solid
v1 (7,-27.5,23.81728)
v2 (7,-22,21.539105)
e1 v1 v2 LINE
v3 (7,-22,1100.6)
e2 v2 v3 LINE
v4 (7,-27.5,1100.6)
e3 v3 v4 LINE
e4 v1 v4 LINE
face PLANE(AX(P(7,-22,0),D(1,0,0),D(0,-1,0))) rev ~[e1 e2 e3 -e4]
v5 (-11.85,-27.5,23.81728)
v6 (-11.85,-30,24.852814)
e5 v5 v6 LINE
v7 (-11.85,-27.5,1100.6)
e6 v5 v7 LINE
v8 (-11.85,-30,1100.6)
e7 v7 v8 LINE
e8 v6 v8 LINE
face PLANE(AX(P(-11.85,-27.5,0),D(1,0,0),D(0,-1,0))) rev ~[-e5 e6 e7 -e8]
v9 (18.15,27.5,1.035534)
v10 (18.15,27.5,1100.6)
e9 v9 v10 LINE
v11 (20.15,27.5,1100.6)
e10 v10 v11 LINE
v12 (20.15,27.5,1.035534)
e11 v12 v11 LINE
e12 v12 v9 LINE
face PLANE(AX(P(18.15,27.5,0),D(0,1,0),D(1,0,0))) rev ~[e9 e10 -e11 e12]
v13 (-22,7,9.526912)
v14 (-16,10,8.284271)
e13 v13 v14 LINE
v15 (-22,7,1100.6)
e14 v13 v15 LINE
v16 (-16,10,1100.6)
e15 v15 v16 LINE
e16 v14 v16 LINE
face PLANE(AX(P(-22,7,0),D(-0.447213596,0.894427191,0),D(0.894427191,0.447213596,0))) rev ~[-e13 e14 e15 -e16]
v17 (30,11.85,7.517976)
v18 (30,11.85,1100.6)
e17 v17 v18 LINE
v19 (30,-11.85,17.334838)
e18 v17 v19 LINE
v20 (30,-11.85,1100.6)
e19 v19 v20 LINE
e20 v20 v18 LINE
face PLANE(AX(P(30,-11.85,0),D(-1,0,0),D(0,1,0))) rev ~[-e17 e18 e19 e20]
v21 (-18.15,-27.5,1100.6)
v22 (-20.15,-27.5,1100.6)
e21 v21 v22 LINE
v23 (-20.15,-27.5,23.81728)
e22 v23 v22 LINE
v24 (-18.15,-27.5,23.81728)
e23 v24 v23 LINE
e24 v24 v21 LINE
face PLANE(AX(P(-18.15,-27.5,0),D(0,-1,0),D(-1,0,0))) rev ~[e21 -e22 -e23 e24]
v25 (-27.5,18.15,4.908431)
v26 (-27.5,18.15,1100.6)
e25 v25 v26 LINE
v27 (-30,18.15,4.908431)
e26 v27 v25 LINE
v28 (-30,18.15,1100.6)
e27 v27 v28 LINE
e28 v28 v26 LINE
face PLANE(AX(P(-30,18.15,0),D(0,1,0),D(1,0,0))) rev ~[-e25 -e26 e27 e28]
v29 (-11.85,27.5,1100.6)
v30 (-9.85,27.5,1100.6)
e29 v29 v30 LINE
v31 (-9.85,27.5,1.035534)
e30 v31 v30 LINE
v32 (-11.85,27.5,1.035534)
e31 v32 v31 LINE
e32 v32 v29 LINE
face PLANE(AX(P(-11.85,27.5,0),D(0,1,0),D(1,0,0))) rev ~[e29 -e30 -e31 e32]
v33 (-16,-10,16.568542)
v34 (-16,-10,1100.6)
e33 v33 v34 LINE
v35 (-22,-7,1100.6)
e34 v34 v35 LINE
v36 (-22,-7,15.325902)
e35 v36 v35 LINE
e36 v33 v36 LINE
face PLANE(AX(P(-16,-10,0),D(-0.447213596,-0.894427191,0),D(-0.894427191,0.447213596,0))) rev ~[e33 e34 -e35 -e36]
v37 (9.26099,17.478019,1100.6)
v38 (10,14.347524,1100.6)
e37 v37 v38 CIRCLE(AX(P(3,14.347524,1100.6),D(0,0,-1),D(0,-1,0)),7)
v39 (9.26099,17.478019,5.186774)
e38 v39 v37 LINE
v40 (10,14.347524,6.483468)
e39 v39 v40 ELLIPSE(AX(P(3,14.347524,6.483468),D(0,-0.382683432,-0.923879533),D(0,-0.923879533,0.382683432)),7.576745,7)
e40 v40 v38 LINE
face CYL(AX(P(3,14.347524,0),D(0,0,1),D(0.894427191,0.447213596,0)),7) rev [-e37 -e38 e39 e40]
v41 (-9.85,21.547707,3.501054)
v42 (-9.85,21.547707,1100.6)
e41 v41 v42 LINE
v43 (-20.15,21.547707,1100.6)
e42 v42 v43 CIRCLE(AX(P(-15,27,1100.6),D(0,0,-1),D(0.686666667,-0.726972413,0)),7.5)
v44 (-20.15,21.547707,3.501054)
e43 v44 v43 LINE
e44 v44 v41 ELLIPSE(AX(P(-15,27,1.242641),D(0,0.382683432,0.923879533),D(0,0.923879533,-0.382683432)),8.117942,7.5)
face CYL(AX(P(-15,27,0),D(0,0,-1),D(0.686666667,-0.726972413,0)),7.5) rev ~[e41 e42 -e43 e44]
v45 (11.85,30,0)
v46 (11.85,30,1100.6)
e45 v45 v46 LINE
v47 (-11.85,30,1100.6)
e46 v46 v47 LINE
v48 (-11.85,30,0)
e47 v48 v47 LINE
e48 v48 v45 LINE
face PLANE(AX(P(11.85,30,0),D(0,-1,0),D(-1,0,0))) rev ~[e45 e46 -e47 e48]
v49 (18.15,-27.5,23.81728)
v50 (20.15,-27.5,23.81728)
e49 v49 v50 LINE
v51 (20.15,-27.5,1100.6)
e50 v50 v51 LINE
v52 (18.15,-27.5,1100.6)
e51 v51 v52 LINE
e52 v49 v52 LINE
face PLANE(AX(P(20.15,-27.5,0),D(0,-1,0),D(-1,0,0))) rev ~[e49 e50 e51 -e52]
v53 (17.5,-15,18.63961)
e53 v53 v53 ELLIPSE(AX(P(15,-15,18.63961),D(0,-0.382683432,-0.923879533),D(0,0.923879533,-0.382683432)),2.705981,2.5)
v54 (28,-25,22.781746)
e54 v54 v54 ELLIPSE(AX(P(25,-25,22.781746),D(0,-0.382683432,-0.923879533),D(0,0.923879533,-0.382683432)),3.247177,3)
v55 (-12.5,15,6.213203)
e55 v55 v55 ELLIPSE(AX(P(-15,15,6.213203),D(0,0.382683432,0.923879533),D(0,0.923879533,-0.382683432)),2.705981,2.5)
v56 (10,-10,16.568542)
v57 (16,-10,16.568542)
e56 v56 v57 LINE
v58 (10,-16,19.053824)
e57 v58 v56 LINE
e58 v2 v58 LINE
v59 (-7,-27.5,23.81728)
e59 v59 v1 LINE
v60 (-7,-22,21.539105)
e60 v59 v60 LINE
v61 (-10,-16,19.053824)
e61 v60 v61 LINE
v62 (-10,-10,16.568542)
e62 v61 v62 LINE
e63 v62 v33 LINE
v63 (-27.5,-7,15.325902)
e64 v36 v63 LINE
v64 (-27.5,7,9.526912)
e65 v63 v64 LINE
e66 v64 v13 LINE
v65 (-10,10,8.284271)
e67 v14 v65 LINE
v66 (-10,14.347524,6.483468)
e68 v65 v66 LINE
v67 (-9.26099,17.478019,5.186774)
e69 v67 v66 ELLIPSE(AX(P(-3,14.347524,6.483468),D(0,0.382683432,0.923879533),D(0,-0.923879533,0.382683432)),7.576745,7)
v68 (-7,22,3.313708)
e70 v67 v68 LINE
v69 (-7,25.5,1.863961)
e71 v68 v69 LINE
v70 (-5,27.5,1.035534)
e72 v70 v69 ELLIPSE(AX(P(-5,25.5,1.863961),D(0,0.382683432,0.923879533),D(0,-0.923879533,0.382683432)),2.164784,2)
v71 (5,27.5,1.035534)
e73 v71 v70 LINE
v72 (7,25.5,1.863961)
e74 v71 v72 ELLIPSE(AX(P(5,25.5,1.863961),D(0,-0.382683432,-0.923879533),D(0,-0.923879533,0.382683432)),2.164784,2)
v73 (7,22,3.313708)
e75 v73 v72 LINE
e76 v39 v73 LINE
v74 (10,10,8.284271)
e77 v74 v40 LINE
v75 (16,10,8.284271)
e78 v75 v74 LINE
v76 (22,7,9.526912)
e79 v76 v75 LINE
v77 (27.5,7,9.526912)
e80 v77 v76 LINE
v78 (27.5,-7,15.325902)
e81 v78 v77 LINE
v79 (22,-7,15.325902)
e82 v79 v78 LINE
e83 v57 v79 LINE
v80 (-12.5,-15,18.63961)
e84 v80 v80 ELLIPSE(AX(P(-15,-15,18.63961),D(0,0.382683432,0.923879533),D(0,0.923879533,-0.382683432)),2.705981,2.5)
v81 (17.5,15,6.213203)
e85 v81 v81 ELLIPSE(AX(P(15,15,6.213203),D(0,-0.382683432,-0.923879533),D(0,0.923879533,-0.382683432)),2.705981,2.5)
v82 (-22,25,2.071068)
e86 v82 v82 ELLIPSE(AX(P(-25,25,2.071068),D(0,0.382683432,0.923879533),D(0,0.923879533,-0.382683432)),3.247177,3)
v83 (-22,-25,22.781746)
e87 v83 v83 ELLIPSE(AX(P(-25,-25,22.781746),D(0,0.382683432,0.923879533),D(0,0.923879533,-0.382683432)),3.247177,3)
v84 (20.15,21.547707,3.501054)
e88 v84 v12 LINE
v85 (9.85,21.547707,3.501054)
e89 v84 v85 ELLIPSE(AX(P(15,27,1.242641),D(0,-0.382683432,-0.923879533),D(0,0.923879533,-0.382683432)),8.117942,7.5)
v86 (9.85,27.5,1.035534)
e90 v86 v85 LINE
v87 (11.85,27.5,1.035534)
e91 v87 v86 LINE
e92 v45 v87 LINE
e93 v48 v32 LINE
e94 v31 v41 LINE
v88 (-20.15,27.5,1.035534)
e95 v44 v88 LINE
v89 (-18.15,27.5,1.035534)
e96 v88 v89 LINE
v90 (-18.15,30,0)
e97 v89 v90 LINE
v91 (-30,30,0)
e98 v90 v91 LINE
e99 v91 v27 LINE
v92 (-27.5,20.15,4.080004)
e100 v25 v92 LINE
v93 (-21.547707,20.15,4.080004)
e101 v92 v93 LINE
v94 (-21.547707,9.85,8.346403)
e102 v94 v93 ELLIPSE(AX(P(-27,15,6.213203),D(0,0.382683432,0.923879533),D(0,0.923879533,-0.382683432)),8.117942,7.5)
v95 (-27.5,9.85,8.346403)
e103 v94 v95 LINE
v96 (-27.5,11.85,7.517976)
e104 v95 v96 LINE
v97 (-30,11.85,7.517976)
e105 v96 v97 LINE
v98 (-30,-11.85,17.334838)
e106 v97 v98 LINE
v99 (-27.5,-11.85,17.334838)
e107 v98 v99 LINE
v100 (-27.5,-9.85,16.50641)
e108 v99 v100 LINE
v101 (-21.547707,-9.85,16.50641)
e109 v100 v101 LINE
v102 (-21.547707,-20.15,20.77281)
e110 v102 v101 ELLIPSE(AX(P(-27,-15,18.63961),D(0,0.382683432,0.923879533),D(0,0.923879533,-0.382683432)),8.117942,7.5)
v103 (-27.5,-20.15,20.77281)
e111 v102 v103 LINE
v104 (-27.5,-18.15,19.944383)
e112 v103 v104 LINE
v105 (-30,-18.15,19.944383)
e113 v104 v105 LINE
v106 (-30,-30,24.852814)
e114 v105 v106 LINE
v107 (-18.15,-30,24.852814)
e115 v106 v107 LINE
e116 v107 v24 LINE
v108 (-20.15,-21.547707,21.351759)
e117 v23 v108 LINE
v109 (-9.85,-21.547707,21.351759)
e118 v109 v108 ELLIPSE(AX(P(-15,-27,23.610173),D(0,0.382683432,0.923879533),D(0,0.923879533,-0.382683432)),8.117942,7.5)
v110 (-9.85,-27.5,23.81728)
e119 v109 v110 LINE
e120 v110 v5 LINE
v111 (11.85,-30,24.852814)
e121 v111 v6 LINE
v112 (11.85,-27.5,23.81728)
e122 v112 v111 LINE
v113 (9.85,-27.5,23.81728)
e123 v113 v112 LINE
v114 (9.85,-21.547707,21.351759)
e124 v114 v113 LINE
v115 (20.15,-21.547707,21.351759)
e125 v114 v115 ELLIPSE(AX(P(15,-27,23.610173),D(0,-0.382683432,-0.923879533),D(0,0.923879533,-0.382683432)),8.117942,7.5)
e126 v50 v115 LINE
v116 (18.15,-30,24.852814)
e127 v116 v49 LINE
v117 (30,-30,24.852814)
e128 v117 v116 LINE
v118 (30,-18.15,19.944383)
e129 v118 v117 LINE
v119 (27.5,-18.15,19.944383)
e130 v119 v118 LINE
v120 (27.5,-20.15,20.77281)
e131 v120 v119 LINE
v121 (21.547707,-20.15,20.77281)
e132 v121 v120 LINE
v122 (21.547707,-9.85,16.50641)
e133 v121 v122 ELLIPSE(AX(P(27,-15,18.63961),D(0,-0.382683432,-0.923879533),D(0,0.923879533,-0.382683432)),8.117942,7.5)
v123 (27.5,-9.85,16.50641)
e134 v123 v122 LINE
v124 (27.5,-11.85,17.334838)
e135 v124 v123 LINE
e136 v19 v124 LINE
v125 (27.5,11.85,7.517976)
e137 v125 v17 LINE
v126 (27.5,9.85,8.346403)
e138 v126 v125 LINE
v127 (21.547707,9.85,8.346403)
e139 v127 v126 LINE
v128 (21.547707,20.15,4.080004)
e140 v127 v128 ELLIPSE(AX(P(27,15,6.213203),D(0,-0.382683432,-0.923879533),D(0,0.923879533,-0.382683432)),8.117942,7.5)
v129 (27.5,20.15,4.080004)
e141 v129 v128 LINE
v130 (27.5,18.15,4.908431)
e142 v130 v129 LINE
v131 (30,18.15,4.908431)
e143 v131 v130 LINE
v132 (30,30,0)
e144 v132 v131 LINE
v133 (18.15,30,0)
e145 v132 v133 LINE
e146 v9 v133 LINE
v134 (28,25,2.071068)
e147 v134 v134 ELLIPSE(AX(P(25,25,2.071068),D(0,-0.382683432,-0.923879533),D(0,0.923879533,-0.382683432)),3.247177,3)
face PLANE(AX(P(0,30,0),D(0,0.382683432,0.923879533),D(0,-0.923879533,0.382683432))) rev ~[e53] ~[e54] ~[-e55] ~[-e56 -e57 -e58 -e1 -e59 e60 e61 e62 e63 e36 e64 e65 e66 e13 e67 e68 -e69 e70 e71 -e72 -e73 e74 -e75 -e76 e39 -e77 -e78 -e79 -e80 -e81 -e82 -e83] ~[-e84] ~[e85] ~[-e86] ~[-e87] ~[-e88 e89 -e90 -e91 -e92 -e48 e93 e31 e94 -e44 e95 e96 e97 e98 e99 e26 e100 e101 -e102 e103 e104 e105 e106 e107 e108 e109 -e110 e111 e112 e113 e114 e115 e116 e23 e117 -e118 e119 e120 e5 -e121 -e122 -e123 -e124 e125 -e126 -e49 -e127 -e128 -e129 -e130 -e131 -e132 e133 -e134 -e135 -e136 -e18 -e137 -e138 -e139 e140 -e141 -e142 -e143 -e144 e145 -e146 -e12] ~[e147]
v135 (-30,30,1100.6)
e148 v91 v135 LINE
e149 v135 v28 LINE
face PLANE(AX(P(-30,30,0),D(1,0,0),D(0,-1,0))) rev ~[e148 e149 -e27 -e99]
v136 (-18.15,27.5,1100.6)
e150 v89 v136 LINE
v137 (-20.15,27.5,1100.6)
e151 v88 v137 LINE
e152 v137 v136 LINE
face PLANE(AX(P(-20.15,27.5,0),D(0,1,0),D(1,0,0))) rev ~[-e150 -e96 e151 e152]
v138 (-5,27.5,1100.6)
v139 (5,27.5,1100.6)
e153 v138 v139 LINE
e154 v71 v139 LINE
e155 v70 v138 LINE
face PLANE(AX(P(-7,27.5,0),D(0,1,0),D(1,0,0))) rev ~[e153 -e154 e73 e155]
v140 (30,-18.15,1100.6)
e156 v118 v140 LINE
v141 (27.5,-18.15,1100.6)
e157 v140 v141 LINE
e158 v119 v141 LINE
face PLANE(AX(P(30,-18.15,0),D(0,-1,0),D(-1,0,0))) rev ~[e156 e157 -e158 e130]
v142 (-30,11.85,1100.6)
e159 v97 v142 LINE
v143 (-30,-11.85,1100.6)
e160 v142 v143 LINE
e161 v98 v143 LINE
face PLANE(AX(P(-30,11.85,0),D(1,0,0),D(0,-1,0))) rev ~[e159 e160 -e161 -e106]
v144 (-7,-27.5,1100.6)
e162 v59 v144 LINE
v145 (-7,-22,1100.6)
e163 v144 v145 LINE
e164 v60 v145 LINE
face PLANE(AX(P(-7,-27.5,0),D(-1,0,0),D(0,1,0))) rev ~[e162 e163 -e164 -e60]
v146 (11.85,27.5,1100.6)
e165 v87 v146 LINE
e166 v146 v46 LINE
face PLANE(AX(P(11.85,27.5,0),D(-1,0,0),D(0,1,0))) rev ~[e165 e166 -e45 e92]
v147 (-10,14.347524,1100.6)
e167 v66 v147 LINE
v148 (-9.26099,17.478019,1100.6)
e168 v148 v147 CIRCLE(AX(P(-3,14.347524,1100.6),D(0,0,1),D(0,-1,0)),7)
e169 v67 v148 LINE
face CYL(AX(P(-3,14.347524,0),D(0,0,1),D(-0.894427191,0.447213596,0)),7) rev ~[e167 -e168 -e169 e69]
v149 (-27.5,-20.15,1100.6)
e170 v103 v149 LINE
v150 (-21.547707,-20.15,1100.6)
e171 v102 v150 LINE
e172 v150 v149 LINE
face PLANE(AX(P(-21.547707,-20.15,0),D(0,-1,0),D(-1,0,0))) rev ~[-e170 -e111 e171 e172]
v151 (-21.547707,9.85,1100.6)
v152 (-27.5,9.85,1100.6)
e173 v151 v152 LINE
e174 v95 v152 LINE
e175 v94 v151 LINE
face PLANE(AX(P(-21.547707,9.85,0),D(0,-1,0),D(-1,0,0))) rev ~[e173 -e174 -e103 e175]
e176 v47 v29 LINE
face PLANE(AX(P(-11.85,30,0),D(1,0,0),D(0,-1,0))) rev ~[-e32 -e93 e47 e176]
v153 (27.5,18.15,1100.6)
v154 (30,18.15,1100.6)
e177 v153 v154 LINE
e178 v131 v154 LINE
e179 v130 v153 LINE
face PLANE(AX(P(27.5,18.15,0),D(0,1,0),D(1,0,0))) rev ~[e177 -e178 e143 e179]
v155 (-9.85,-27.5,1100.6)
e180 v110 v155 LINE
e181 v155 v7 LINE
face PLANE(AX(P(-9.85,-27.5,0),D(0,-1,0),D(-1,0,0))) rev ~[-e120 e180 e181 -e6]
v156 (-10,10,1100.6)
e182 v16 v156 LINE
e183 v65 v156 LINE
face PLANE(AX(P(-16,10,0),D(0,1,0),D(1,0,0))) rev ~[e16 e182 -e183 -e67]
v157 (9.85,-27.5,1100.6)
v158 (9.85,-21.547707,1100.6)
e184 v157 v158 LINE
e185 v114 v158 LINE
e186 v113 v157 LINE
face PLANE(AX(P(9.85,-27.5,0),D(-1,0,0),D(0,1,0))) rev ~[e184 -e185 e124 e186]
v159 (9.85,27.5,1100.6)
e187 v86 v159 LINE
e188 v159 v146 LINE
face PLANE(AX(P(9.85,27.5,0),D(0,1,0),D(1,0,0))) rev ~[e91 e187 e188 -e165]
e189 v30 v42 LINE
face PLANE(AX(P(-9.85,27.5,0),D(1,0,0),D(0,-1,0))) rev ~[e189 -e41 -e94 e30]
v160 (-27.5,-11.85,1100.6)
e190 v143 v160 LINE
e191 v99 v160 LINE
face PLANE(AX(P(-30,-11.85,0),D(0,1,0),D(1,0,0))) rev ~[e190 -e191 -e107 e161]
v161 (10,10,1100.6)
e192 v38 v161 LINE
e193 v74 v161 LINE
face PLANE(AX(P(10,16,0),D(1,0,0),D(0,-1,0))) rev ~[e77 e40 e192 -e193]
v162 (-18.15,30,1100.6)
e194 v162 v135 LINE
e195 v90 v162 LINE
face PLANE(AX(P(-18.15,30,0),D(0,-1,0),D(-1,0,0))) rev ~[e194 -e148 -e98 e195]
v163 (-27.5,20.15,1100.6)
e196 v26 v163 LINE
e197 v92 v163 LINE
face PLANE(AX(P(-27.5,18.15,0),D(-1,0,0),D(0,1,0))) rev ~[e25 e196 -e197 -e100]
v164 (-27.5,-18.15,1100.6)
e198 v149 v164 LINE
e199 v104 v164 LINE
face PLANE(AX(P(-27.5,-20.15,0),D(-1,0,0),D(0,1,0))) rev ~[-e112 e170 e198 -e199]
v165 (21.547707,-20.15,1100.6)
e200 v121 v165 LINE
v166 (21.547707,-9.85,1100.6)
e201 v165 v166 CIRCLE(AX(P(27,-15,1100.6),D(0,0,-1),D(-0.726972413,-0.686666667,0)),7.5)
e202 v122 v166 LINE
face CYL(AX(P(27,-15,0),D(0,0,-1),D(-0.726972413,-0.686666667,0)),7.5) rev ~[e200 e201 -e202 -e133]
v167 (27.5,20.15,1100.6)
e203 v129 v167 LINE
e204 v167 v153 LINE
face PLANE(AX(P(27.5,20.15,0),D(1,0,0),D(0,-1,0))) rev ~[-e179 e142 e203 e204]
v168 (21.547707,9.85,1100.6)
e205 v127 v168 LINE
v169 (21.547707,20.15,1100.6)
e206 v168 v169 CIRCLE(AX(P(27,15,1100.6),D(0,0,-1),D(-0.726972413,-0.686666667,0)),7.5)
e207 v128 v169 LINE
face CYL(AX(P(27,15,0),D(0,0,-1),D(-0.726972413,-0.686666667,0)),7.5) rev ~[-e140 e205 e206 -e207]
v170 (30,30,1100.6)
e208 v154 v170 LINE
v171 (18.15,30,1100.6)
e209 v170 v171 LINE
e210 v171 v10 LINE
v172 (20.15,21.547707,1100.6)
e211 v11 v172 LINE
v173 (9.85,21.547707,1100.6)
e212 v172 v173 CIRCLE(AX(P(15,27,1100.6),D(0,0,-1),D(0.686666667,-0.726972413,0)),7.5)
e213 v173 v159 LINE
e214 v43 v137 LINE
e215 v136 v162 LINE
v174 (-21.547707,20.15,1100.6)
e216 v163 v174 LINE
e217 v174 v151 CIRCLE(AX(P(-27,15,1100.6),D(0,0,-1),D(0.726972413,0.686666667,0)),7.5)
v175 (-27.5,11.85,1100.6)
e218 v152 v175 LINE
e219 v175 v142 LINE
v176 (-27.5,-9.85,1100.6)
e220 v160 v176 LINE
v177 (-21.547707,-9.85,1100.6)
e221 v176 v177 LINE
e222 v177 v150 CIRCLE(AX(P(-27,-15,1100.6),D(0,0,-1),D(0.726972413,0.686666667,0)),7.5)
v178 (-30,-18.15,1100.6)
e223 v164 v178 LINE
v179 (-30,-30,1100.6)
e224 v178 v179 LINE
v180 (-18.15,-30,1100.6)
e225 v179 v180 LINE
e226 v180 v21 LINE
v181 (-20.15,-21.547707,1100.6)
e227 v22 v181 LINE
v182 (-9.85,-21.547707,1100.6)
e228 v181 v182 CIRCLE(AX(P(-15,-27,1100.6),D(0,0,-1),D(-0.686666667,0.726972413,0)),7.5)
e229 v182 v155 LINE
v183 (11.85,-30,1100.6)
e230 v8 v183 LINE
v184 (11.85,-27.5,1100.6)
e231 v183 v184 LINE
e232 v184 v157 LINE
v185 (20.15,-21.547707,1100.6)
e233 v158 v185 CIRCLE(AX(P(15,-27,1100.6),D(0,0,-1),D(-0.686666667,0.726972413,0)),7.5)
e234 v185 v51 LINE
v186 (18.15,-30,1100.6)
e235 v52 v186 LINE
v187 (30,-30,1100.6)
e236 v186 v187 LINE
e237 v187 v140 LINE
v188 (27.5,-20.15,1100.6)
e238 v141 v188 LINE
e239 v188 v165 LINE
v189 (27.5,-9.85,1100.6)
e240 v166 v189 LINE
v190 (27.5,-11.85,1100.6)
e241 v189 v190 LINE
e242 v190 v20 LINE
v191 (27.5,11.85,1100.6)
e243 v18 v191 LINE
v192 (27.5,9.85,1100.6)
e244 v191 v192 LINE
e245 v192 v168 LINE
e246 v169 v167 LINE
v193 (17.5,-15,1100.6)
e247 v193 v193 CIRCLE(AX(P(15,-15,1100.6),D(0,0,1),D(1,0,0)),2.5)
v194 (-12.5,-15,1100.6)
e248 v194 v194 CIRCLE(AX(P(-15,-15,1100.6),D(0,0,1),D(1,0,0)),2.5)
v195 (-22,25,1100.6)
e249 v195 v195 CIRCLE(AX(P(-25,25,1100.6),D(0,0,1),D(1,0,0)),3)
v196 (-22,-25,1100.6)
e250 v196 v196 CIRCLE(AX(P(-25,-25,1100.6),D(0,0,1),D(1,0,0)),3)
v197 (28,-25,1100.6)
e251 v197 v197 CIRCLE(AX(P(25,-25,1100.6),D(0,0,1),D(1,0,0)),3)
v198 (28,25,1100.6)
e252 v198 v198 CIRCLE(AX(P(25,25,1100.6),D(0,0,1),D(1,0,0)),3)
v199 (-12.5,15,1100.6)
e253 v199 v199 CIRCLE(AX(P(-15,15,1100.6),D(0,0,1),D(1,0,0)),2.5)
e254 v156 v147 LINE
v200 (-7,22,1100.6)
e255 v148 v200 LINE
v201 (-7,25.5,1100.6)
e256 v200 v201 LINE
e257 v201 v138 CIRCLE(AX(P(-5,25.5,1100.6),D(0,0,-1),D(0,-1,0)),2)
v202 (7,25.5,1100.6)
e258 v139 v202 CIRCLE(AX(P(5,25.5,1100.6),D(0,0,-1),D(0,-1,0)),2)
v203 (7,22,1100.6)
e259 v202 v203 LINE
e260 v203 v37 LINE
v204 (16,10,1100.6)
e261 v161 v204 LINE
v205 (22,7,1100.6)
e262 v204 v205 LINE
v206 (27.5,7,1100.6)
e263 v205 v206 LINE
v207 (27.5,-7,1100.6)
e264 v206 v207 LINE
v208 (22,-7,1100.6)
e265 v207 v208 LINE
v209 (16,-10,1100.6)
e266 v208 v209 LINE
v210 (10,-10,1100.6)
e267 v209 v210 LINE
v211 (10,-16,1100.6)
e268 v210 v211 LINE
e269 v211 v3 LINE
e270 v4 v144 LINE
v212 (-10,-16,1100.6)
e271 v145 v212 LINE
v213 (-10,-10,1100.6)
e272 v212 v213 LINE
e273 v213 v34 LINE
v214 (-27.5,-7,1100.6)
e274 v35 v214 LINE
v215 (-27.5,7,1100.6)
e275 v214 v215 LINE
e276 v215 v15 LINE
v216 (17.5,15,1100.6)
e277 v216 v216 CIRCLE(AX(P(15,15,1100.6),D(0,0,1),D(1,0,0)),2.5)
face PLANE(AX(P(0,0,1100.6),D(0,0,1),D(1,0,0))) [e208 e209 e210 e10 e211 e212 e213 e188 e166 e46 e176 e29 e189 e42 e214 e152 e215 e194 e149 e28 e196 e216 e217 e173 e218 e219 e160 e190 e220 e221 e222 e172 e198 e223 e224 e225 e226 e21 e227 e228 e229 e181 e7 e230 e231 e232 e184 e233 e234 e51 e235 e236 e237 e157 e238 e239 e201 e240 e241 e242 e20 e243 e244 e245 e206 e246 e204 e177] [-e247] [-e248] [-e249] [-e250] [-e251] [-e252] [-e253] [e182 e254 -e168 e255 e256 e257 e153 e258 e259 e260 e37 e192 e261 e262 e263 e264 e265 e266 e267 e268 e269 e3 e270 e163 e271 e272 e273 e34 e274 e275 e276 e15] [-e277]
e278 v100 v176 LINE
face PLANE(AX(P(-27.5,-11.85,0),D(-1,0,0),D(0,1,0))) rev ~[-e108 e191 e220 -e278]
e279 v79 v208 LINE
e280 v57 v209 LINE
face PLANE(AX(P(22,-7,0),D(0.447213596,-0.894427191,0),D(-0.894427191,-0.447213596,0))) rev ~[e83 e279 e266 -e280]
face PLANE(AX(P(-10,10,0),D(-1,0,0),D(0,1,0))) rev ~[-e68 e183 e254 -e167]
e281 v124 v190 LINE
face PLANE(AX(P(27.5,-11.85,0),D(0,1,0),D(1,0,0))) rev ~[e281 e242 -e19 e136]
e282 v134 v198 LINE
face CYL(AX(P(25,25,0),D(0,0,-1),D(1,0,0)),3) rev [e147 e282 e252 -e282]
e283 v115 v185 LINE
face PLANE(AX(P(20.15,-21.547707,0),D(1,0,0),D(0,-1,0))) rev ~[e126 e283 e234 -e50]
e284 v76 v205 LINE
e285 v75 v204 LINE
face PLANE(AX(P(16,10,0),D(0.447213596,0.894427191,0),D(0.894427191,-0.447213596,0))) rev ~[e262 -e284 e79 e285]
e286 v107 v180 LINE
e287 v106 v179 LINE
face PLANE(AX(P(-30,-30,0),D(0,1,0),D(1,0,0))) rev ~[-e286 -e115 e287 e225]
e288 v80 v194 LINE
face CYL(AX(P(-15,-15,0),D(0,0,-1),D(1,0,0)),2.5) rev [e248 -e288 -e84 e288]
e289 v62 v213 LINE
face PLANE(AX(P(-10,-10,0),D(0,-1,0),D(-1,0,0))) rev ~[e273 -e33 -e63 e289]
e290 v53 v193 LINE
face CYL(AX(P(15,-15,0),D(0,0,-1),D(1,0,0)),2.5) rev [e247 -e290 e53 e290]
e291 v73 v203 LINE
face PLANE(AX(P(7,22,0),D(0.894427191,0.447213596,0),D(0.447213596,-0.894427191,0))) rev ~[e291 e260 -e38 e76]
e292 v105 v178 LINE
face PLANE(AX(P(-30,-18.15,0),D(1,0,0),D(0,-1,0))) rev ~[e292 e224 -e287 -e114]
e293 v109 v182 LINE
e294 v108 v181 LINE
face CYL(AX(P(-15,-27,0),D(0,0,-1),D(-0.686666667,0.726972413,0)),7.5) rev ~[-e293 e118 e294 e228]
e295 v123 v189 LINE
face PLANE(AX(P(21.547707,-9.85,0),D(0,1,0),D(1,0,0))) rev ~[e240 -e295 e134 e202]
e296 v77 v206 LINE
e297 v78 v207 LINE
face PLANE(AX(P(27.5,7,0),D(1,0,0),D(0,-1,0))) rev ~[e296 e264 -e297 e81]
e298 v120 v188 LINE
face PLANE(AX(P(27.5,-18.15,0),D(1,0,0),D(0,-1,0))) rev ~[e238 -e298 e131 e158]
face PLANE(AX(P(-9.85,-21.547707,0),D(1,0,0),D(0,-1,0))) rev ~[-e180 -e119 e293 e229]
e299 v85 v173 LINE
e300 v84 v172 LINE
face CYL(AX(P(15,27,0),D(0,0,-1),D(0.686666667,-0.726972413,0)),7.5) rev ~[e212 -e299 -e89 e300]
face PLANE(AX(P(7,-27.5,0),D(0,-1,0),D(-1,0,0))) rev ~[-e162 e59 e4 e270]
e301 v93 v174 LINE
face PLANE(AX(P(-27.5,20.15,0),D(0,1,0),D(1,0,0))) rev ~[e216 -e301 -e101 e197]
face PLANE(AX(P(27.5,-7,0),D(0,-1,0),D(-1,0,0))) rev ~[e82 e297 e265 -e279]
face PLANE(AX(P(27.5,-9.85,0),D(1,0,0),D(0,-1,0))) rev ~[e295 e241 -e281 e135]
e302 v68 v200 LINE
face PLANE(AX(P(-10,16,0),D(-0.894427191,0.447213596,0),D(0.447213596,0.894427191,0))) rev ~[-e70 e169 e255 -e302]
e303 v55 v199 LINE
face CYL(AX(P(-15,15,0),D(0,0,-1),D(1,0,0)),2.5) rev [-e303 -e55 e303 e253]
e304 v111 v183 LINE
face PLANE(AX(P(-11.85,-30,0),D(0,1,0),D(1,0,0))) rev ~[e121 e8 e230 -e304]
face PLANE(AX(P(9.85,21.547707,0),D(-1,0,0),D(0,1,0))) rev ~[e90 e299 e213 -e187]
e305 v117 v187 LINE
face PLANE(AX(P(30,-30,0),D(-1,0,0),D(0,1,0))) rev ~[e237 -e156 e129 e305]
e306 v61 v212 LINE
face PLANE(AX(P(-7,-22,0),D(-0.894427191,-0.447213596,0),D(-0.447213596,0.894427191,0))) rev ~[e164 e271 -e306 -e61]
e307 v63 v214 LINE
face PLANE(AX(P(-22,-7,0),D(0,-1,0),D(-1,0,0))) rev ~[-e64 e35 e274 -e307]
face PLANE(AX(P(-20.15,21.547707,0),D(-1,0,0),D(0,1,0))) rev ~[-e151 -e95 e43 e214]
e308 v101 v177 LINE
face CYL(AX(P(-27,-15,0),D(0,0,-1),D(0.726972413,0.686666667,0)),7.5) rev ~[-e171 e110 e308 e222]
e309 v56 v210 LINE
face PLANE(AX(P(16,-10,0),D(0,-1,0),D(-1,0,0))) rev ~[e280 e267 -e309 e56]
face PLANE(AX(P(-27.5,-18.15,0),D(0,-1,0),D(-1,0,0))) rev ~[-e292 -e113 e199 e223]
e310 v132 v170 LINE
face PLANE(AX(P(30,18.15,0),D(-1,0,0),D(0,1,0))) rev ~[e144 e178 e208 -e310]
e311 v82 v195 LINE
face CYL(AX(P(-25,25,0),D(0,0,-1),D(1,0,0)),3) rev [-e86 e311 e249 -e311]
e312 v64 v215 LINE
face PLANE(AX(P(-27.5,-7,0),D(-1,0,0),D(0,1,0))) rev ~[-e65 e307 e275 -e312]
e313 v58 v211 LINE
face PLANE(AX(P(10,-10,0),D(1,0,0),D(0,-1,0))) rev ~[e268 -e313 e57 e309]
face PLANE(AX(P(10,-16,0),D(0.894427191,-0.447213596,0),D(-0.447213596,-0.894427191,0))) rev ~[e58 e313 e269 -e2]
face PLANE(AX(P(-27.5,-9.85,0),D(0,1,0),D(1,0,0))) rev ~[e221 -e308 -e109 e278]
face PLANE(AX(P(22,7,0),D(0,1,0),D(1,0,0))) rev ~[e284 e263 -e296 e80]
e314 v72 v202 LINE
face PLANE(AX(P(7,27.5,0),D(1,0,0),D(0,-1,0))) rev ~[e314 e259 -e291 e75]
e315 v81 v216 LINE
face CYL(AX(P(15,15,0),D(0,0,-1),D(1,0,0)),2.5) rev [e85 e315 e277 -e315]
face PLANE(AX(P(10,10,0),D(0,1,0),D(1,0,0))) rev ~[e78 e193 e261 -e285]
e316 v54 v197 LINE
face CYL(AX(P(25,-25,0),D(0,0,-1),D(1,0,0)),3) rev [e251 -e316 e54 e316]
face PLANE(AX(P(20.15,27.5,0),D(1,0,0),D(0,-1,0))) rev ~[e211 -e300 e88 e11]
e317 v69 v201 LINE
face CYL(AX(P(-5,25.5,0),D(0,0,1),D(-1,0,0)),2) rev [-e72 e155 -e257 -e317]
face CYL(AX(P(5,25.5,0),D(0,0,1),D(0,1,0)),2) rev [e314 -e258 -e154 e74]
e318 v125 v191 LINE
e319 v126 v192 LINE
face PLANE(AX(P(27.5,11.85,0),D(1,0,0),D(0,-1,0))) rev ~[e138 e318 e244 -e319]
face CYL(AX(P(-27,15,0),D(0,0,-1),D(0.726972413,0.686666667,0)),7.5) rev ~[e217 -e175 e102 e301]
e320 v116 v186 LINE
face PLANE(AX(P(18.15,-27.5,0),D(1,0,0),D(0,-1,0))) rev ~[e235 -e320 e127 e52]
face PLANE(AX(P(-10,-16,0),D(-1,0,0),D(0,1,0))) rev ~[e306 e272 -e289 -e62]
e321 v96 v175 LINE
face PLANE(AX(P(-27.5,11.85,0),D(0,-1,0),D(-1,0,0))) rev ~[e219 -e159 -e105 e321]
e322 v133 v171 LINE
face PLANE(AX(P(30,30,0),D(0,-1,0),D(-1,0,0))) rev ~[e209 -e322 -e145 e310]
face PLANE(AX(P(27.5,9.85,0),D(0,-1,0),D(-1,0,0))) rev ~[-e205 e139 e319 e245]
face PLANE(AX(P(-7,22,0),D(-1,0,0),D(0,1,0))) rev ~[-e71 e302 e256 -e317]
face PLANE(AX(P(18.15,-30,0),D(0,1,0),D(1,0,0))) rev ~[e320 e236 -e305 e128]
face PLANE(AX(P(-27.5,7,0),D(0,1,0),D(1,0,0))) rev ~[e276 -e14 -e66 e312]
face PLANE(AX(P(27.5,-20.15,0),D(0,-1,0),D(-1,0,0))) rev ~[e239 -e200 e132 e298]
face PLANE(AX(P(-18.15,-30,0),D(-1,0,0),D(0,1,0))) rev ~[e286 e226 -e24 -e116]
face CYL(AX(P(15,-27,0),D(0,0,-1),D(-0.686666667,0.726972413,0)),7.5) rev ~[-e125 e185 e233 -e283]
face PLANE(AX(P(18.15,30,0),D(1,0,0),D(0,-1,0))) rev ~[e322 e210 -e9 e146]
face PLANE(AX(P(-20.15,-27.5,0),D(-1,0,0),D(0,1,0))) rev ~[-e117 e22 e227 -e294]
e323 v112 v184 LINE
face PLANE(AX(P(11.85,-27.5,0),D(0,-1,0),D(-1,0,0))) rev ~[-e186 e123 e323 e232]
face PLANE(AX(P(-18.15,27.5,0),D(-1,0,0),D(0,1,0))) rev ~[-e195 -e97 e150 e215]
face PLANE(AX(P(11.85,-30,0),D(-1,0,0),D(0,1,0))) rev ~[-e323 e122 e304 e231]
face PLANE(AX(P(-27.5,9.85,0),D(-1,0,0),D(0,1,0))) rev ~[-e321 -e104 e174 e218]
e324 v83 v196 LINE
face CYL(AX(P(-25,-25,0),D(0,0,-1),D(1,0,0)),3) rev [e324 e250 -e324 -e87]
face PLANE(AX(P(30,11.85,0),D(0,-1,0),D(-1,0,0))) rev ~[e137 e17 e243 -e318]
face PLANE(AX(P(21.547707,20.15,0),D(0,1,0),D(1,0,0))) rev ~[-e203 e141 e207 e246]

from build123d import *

# Parameters (mm, degrees)
F0_R          = 3
F0_R_2        = 2.5
F1_DEPTH      = 1100.6
F2_R          = 2
F3_R          = 7
F5_DEPTH      = 30
F5_DEPTH_BACK = 30


# Not quite as in the source:
# - a feature names something its author has since deleted; it is built from what else it names


with BuildPart() as f1:
    # F0 (on Top) → F1 (new body)
    with BuildSketch(Plane.XY):
        with BuildLine():
            Line((18.15, -30), (30, -30))
            Line((30, -30), (30, -18.15))
            Line((30, -18.15), (27.5, -18.15))
            Line((27.5, -18.15), (27.5, -20.15))
            Line((27.5, -20.15), (21.5477069044, -20.15))
            ThreePointArc((21.5477069044, -20.15), (19.5, -15), (21.5477069044, -9.85))
            Line((21.5477069044, -9.85), (27.5, -9.85))
            Line((27.5, -9.85), (27.5, -11.85))
            Line((27.5, -11.85), (30, -11.85))
            Line((30, -11.85), (30, 11.85))
            Line((30, 11.85), (27.5, 11.85))
            Line((27.5, 11.85), (27.5, 9.85))
            Line((27.5, 9.85), (21.5477069044, 9.85))
            ThreePointArc((21.5477069044, 9.85), (19.5, 15), (21.5477069044, 20.15))
            Line((21.5477069044, 20.15), (27.5, 20.15))
            Line((27.5, 20.15), (27.5, 18.15))
            Line((27.5, 18.15), (30, 18.15))
            Line((30, 18.15), (30, 30))
            Line((30, 30), (18.15, 30))
            Line((18.15, 30), (18.15, 27.5))
            Line((18.15, 27.5), (20.15, 27.5))
            Line((20.15, 27.5), (20.15, 21.5477069044))
            ThreePointArc((20.15, 21.5477069044), (15, 19.5), (9.85, 21.5477069044))
            Line((9.85, 21.5477069044), (9.85, 27.5))
            Line((9.85, 27.5), (11.85, 27.5))
            Line((11.85, 27.5), (11.85, 30))
            Line((11.85, 30), (-11.85, 30))
            Line((-11.85, 30), (-11.85, 27.5))
            Line((-11.85, 27.5), (-9.85, 27.5))
            Line((-9.85, 27.5), (-9.85, 21.5477069044))
            ThreePointArc((-9.85, 21.5477069044), (-15, 19.5), (-20.15, 21.5477069044))
            Line((-20.15, 21.5477069044), (-20.15, 27.5))
            Line((-20.15, 27.5), (-18.15, 27.5))
            Line((-18.15, 27.5), (-18.15, 30))
            Line((-18.15, 30), (-30, 30))
            Line((-30, 30), (-30, 18.15))
            Line((-30, 18.15), (-27.5, 18.15))
            Line((-27.5, 18.15), (-27.5, 20.15))
            Line((-27.5, 20.15), (-21.5477069044, 20.15))
            ThreePointArc((-21.5477069044, 20.15), (-19.5, 15), (-21.5477069044, 9.85))
            Line((-21.5477069044, 9.85), (-27.5, 9.85))
            Line((-27.5, 9.85), (-27.5, 11.85))
            Line((-27.5, 11.85), (-30, 11.85))
            Line((-30, 11.85), (-30, -11.85))
            Line((-30, -11.85), (-27.5, -11.85))
            Line((-27.5, -11.85), (-27.5, -9.85))
            Line((-27.5, -9.85), (-21.5477069044, -9.85))
            ThreePointArc((-21.5477069044, -9.85), (-19.5, -15), (-21.5477069044, -20.15))
            Line((-21.5477069044, -20.15), (-27.5, -20.15))
            Line((-27.5, -20.15), (-27.5, -18.15))
            Line((-27.5, -18.15), (-30, -18.15))
            Line((-30, -18.15), (-30, -30))
            Line((-30, -30), (-18.15, -30))
            Line((-18.15, -30), (-18.15, -27.5))
            Line((-18.15, -27.5), (-20.15, -27.5))
            Line((-20.15, -27.5), (-20.15, -21.5477069044))
            ThreePointArc((-20.15, -21.5477069044), (-15, -19.5), (-9.85, -21.5477069044))
            Line((-9.85, -21.5477069044), (-9.85, -27.5))
            Line((-9.85, -27.5), (-11.85, -27.5))
            Line((-11.85, -27.5), (-11.85, -30))
            Line((-11.85, -30), (11.85, -30))
            Line((11.85, -30), (11.85, -27.5))
            Line((11.85, -27.5), (9.85, -27.5))
            Line((9.85, -27.5), (9.85, -21.5477069044))
            ThreePointArc((9.85, -21.5477069044), (15, -19.5), (20.15, -21.5477069044))
            Line((20.15, -21.5477069044), (20.15, -27.5))
            Line((20.15, -27.5), (18.15, -27.5))
            Line((18.15, -27.5), (18.15, -30))
        make_face()
        with Locations((-25, -25)):
            Circle(F0_R, mode=Mode.SUBTRACT)
        with Locations((-15, -15)):
            Circle(F0_R_2, mode=Mode.SUBTRACT)
        with Locations((25, -25)):
            Circle(F0_R, mode=Mode.SUBTRACT)
        with Locations((15, -15)):
            Circle(F0_R_2, mode=Mode.SUBTRACT)
        with Locations((-25, 25)):
            Circle(F0_R, mode=Mode.SUBTRACT)
        with Locations((-15, 15)):
            Circle(F0_R_2, mode=Mode.SUBTRACT)
        Polygon((-7, 22), (-7, 27.5), (0, 27.5), (7, 27.5), (7, 22), (10, 16), (10, 10), (16, 10), (22, 7), (27.5, 7), (27.5, 0), (27.5, -7), (22, -7), (16, -10), (10, -10), (10, -16), (7, -22), (7, -27.5), (0, -27.5), (-7, -27.5), (-7, -22), (-10, -16), (-10, -10), (-16, -10), (-22, -7), (-27.5, -7), (-27.5, 0), (-27.5, 7), (-22, 7), (-16, 10), (-10, 10), (-10, 16), align=None, mode=Mode.SUBTRACT)
        with Locations((15, 15)):
            Circle(F0_R_2, mode=Mode.SUBTRACT)
        with Locations((25, 25)):
            Circle(F0_R, mode=Mode.SUBTRACT)
    extrude(amount=F1_DEPTH)

    # F2
    f2_edges = [f1.edges().sort_by_distance(p)[0] for p in [
        (-7, 27.5, 550.3),
        (7, 27.5, 550.3),
    ]]
    fillet(f2_edges, radius=F2_R)

    # F3
    f3_edges = [f1.edges().sort_by_distance(p)[0] for p in [
        (-10, 16, 550.3),
        (10, 16, 550.3),
    ]]
    fillet(f3_edges, radius=F3_R)

    # F4 (on Right) → F5 (cut, two sides)
    with BuildSketch(Plane.YZ) as f5_sk:
        Polygon((-153.0130330148, 75.8064803658), (-200.6900714338, -39.2960723993), (-17.6770384191, -115.1025527651), (30, 0), align=None)
    extrude(amount=F5_DEPTH, mode=Mode.SUBTRACT)
    extrude(f5_sk.sketch, amount=-F5_DEPTH_BACK, mode=Mode.SUBTRACT)


solid = f1.part
